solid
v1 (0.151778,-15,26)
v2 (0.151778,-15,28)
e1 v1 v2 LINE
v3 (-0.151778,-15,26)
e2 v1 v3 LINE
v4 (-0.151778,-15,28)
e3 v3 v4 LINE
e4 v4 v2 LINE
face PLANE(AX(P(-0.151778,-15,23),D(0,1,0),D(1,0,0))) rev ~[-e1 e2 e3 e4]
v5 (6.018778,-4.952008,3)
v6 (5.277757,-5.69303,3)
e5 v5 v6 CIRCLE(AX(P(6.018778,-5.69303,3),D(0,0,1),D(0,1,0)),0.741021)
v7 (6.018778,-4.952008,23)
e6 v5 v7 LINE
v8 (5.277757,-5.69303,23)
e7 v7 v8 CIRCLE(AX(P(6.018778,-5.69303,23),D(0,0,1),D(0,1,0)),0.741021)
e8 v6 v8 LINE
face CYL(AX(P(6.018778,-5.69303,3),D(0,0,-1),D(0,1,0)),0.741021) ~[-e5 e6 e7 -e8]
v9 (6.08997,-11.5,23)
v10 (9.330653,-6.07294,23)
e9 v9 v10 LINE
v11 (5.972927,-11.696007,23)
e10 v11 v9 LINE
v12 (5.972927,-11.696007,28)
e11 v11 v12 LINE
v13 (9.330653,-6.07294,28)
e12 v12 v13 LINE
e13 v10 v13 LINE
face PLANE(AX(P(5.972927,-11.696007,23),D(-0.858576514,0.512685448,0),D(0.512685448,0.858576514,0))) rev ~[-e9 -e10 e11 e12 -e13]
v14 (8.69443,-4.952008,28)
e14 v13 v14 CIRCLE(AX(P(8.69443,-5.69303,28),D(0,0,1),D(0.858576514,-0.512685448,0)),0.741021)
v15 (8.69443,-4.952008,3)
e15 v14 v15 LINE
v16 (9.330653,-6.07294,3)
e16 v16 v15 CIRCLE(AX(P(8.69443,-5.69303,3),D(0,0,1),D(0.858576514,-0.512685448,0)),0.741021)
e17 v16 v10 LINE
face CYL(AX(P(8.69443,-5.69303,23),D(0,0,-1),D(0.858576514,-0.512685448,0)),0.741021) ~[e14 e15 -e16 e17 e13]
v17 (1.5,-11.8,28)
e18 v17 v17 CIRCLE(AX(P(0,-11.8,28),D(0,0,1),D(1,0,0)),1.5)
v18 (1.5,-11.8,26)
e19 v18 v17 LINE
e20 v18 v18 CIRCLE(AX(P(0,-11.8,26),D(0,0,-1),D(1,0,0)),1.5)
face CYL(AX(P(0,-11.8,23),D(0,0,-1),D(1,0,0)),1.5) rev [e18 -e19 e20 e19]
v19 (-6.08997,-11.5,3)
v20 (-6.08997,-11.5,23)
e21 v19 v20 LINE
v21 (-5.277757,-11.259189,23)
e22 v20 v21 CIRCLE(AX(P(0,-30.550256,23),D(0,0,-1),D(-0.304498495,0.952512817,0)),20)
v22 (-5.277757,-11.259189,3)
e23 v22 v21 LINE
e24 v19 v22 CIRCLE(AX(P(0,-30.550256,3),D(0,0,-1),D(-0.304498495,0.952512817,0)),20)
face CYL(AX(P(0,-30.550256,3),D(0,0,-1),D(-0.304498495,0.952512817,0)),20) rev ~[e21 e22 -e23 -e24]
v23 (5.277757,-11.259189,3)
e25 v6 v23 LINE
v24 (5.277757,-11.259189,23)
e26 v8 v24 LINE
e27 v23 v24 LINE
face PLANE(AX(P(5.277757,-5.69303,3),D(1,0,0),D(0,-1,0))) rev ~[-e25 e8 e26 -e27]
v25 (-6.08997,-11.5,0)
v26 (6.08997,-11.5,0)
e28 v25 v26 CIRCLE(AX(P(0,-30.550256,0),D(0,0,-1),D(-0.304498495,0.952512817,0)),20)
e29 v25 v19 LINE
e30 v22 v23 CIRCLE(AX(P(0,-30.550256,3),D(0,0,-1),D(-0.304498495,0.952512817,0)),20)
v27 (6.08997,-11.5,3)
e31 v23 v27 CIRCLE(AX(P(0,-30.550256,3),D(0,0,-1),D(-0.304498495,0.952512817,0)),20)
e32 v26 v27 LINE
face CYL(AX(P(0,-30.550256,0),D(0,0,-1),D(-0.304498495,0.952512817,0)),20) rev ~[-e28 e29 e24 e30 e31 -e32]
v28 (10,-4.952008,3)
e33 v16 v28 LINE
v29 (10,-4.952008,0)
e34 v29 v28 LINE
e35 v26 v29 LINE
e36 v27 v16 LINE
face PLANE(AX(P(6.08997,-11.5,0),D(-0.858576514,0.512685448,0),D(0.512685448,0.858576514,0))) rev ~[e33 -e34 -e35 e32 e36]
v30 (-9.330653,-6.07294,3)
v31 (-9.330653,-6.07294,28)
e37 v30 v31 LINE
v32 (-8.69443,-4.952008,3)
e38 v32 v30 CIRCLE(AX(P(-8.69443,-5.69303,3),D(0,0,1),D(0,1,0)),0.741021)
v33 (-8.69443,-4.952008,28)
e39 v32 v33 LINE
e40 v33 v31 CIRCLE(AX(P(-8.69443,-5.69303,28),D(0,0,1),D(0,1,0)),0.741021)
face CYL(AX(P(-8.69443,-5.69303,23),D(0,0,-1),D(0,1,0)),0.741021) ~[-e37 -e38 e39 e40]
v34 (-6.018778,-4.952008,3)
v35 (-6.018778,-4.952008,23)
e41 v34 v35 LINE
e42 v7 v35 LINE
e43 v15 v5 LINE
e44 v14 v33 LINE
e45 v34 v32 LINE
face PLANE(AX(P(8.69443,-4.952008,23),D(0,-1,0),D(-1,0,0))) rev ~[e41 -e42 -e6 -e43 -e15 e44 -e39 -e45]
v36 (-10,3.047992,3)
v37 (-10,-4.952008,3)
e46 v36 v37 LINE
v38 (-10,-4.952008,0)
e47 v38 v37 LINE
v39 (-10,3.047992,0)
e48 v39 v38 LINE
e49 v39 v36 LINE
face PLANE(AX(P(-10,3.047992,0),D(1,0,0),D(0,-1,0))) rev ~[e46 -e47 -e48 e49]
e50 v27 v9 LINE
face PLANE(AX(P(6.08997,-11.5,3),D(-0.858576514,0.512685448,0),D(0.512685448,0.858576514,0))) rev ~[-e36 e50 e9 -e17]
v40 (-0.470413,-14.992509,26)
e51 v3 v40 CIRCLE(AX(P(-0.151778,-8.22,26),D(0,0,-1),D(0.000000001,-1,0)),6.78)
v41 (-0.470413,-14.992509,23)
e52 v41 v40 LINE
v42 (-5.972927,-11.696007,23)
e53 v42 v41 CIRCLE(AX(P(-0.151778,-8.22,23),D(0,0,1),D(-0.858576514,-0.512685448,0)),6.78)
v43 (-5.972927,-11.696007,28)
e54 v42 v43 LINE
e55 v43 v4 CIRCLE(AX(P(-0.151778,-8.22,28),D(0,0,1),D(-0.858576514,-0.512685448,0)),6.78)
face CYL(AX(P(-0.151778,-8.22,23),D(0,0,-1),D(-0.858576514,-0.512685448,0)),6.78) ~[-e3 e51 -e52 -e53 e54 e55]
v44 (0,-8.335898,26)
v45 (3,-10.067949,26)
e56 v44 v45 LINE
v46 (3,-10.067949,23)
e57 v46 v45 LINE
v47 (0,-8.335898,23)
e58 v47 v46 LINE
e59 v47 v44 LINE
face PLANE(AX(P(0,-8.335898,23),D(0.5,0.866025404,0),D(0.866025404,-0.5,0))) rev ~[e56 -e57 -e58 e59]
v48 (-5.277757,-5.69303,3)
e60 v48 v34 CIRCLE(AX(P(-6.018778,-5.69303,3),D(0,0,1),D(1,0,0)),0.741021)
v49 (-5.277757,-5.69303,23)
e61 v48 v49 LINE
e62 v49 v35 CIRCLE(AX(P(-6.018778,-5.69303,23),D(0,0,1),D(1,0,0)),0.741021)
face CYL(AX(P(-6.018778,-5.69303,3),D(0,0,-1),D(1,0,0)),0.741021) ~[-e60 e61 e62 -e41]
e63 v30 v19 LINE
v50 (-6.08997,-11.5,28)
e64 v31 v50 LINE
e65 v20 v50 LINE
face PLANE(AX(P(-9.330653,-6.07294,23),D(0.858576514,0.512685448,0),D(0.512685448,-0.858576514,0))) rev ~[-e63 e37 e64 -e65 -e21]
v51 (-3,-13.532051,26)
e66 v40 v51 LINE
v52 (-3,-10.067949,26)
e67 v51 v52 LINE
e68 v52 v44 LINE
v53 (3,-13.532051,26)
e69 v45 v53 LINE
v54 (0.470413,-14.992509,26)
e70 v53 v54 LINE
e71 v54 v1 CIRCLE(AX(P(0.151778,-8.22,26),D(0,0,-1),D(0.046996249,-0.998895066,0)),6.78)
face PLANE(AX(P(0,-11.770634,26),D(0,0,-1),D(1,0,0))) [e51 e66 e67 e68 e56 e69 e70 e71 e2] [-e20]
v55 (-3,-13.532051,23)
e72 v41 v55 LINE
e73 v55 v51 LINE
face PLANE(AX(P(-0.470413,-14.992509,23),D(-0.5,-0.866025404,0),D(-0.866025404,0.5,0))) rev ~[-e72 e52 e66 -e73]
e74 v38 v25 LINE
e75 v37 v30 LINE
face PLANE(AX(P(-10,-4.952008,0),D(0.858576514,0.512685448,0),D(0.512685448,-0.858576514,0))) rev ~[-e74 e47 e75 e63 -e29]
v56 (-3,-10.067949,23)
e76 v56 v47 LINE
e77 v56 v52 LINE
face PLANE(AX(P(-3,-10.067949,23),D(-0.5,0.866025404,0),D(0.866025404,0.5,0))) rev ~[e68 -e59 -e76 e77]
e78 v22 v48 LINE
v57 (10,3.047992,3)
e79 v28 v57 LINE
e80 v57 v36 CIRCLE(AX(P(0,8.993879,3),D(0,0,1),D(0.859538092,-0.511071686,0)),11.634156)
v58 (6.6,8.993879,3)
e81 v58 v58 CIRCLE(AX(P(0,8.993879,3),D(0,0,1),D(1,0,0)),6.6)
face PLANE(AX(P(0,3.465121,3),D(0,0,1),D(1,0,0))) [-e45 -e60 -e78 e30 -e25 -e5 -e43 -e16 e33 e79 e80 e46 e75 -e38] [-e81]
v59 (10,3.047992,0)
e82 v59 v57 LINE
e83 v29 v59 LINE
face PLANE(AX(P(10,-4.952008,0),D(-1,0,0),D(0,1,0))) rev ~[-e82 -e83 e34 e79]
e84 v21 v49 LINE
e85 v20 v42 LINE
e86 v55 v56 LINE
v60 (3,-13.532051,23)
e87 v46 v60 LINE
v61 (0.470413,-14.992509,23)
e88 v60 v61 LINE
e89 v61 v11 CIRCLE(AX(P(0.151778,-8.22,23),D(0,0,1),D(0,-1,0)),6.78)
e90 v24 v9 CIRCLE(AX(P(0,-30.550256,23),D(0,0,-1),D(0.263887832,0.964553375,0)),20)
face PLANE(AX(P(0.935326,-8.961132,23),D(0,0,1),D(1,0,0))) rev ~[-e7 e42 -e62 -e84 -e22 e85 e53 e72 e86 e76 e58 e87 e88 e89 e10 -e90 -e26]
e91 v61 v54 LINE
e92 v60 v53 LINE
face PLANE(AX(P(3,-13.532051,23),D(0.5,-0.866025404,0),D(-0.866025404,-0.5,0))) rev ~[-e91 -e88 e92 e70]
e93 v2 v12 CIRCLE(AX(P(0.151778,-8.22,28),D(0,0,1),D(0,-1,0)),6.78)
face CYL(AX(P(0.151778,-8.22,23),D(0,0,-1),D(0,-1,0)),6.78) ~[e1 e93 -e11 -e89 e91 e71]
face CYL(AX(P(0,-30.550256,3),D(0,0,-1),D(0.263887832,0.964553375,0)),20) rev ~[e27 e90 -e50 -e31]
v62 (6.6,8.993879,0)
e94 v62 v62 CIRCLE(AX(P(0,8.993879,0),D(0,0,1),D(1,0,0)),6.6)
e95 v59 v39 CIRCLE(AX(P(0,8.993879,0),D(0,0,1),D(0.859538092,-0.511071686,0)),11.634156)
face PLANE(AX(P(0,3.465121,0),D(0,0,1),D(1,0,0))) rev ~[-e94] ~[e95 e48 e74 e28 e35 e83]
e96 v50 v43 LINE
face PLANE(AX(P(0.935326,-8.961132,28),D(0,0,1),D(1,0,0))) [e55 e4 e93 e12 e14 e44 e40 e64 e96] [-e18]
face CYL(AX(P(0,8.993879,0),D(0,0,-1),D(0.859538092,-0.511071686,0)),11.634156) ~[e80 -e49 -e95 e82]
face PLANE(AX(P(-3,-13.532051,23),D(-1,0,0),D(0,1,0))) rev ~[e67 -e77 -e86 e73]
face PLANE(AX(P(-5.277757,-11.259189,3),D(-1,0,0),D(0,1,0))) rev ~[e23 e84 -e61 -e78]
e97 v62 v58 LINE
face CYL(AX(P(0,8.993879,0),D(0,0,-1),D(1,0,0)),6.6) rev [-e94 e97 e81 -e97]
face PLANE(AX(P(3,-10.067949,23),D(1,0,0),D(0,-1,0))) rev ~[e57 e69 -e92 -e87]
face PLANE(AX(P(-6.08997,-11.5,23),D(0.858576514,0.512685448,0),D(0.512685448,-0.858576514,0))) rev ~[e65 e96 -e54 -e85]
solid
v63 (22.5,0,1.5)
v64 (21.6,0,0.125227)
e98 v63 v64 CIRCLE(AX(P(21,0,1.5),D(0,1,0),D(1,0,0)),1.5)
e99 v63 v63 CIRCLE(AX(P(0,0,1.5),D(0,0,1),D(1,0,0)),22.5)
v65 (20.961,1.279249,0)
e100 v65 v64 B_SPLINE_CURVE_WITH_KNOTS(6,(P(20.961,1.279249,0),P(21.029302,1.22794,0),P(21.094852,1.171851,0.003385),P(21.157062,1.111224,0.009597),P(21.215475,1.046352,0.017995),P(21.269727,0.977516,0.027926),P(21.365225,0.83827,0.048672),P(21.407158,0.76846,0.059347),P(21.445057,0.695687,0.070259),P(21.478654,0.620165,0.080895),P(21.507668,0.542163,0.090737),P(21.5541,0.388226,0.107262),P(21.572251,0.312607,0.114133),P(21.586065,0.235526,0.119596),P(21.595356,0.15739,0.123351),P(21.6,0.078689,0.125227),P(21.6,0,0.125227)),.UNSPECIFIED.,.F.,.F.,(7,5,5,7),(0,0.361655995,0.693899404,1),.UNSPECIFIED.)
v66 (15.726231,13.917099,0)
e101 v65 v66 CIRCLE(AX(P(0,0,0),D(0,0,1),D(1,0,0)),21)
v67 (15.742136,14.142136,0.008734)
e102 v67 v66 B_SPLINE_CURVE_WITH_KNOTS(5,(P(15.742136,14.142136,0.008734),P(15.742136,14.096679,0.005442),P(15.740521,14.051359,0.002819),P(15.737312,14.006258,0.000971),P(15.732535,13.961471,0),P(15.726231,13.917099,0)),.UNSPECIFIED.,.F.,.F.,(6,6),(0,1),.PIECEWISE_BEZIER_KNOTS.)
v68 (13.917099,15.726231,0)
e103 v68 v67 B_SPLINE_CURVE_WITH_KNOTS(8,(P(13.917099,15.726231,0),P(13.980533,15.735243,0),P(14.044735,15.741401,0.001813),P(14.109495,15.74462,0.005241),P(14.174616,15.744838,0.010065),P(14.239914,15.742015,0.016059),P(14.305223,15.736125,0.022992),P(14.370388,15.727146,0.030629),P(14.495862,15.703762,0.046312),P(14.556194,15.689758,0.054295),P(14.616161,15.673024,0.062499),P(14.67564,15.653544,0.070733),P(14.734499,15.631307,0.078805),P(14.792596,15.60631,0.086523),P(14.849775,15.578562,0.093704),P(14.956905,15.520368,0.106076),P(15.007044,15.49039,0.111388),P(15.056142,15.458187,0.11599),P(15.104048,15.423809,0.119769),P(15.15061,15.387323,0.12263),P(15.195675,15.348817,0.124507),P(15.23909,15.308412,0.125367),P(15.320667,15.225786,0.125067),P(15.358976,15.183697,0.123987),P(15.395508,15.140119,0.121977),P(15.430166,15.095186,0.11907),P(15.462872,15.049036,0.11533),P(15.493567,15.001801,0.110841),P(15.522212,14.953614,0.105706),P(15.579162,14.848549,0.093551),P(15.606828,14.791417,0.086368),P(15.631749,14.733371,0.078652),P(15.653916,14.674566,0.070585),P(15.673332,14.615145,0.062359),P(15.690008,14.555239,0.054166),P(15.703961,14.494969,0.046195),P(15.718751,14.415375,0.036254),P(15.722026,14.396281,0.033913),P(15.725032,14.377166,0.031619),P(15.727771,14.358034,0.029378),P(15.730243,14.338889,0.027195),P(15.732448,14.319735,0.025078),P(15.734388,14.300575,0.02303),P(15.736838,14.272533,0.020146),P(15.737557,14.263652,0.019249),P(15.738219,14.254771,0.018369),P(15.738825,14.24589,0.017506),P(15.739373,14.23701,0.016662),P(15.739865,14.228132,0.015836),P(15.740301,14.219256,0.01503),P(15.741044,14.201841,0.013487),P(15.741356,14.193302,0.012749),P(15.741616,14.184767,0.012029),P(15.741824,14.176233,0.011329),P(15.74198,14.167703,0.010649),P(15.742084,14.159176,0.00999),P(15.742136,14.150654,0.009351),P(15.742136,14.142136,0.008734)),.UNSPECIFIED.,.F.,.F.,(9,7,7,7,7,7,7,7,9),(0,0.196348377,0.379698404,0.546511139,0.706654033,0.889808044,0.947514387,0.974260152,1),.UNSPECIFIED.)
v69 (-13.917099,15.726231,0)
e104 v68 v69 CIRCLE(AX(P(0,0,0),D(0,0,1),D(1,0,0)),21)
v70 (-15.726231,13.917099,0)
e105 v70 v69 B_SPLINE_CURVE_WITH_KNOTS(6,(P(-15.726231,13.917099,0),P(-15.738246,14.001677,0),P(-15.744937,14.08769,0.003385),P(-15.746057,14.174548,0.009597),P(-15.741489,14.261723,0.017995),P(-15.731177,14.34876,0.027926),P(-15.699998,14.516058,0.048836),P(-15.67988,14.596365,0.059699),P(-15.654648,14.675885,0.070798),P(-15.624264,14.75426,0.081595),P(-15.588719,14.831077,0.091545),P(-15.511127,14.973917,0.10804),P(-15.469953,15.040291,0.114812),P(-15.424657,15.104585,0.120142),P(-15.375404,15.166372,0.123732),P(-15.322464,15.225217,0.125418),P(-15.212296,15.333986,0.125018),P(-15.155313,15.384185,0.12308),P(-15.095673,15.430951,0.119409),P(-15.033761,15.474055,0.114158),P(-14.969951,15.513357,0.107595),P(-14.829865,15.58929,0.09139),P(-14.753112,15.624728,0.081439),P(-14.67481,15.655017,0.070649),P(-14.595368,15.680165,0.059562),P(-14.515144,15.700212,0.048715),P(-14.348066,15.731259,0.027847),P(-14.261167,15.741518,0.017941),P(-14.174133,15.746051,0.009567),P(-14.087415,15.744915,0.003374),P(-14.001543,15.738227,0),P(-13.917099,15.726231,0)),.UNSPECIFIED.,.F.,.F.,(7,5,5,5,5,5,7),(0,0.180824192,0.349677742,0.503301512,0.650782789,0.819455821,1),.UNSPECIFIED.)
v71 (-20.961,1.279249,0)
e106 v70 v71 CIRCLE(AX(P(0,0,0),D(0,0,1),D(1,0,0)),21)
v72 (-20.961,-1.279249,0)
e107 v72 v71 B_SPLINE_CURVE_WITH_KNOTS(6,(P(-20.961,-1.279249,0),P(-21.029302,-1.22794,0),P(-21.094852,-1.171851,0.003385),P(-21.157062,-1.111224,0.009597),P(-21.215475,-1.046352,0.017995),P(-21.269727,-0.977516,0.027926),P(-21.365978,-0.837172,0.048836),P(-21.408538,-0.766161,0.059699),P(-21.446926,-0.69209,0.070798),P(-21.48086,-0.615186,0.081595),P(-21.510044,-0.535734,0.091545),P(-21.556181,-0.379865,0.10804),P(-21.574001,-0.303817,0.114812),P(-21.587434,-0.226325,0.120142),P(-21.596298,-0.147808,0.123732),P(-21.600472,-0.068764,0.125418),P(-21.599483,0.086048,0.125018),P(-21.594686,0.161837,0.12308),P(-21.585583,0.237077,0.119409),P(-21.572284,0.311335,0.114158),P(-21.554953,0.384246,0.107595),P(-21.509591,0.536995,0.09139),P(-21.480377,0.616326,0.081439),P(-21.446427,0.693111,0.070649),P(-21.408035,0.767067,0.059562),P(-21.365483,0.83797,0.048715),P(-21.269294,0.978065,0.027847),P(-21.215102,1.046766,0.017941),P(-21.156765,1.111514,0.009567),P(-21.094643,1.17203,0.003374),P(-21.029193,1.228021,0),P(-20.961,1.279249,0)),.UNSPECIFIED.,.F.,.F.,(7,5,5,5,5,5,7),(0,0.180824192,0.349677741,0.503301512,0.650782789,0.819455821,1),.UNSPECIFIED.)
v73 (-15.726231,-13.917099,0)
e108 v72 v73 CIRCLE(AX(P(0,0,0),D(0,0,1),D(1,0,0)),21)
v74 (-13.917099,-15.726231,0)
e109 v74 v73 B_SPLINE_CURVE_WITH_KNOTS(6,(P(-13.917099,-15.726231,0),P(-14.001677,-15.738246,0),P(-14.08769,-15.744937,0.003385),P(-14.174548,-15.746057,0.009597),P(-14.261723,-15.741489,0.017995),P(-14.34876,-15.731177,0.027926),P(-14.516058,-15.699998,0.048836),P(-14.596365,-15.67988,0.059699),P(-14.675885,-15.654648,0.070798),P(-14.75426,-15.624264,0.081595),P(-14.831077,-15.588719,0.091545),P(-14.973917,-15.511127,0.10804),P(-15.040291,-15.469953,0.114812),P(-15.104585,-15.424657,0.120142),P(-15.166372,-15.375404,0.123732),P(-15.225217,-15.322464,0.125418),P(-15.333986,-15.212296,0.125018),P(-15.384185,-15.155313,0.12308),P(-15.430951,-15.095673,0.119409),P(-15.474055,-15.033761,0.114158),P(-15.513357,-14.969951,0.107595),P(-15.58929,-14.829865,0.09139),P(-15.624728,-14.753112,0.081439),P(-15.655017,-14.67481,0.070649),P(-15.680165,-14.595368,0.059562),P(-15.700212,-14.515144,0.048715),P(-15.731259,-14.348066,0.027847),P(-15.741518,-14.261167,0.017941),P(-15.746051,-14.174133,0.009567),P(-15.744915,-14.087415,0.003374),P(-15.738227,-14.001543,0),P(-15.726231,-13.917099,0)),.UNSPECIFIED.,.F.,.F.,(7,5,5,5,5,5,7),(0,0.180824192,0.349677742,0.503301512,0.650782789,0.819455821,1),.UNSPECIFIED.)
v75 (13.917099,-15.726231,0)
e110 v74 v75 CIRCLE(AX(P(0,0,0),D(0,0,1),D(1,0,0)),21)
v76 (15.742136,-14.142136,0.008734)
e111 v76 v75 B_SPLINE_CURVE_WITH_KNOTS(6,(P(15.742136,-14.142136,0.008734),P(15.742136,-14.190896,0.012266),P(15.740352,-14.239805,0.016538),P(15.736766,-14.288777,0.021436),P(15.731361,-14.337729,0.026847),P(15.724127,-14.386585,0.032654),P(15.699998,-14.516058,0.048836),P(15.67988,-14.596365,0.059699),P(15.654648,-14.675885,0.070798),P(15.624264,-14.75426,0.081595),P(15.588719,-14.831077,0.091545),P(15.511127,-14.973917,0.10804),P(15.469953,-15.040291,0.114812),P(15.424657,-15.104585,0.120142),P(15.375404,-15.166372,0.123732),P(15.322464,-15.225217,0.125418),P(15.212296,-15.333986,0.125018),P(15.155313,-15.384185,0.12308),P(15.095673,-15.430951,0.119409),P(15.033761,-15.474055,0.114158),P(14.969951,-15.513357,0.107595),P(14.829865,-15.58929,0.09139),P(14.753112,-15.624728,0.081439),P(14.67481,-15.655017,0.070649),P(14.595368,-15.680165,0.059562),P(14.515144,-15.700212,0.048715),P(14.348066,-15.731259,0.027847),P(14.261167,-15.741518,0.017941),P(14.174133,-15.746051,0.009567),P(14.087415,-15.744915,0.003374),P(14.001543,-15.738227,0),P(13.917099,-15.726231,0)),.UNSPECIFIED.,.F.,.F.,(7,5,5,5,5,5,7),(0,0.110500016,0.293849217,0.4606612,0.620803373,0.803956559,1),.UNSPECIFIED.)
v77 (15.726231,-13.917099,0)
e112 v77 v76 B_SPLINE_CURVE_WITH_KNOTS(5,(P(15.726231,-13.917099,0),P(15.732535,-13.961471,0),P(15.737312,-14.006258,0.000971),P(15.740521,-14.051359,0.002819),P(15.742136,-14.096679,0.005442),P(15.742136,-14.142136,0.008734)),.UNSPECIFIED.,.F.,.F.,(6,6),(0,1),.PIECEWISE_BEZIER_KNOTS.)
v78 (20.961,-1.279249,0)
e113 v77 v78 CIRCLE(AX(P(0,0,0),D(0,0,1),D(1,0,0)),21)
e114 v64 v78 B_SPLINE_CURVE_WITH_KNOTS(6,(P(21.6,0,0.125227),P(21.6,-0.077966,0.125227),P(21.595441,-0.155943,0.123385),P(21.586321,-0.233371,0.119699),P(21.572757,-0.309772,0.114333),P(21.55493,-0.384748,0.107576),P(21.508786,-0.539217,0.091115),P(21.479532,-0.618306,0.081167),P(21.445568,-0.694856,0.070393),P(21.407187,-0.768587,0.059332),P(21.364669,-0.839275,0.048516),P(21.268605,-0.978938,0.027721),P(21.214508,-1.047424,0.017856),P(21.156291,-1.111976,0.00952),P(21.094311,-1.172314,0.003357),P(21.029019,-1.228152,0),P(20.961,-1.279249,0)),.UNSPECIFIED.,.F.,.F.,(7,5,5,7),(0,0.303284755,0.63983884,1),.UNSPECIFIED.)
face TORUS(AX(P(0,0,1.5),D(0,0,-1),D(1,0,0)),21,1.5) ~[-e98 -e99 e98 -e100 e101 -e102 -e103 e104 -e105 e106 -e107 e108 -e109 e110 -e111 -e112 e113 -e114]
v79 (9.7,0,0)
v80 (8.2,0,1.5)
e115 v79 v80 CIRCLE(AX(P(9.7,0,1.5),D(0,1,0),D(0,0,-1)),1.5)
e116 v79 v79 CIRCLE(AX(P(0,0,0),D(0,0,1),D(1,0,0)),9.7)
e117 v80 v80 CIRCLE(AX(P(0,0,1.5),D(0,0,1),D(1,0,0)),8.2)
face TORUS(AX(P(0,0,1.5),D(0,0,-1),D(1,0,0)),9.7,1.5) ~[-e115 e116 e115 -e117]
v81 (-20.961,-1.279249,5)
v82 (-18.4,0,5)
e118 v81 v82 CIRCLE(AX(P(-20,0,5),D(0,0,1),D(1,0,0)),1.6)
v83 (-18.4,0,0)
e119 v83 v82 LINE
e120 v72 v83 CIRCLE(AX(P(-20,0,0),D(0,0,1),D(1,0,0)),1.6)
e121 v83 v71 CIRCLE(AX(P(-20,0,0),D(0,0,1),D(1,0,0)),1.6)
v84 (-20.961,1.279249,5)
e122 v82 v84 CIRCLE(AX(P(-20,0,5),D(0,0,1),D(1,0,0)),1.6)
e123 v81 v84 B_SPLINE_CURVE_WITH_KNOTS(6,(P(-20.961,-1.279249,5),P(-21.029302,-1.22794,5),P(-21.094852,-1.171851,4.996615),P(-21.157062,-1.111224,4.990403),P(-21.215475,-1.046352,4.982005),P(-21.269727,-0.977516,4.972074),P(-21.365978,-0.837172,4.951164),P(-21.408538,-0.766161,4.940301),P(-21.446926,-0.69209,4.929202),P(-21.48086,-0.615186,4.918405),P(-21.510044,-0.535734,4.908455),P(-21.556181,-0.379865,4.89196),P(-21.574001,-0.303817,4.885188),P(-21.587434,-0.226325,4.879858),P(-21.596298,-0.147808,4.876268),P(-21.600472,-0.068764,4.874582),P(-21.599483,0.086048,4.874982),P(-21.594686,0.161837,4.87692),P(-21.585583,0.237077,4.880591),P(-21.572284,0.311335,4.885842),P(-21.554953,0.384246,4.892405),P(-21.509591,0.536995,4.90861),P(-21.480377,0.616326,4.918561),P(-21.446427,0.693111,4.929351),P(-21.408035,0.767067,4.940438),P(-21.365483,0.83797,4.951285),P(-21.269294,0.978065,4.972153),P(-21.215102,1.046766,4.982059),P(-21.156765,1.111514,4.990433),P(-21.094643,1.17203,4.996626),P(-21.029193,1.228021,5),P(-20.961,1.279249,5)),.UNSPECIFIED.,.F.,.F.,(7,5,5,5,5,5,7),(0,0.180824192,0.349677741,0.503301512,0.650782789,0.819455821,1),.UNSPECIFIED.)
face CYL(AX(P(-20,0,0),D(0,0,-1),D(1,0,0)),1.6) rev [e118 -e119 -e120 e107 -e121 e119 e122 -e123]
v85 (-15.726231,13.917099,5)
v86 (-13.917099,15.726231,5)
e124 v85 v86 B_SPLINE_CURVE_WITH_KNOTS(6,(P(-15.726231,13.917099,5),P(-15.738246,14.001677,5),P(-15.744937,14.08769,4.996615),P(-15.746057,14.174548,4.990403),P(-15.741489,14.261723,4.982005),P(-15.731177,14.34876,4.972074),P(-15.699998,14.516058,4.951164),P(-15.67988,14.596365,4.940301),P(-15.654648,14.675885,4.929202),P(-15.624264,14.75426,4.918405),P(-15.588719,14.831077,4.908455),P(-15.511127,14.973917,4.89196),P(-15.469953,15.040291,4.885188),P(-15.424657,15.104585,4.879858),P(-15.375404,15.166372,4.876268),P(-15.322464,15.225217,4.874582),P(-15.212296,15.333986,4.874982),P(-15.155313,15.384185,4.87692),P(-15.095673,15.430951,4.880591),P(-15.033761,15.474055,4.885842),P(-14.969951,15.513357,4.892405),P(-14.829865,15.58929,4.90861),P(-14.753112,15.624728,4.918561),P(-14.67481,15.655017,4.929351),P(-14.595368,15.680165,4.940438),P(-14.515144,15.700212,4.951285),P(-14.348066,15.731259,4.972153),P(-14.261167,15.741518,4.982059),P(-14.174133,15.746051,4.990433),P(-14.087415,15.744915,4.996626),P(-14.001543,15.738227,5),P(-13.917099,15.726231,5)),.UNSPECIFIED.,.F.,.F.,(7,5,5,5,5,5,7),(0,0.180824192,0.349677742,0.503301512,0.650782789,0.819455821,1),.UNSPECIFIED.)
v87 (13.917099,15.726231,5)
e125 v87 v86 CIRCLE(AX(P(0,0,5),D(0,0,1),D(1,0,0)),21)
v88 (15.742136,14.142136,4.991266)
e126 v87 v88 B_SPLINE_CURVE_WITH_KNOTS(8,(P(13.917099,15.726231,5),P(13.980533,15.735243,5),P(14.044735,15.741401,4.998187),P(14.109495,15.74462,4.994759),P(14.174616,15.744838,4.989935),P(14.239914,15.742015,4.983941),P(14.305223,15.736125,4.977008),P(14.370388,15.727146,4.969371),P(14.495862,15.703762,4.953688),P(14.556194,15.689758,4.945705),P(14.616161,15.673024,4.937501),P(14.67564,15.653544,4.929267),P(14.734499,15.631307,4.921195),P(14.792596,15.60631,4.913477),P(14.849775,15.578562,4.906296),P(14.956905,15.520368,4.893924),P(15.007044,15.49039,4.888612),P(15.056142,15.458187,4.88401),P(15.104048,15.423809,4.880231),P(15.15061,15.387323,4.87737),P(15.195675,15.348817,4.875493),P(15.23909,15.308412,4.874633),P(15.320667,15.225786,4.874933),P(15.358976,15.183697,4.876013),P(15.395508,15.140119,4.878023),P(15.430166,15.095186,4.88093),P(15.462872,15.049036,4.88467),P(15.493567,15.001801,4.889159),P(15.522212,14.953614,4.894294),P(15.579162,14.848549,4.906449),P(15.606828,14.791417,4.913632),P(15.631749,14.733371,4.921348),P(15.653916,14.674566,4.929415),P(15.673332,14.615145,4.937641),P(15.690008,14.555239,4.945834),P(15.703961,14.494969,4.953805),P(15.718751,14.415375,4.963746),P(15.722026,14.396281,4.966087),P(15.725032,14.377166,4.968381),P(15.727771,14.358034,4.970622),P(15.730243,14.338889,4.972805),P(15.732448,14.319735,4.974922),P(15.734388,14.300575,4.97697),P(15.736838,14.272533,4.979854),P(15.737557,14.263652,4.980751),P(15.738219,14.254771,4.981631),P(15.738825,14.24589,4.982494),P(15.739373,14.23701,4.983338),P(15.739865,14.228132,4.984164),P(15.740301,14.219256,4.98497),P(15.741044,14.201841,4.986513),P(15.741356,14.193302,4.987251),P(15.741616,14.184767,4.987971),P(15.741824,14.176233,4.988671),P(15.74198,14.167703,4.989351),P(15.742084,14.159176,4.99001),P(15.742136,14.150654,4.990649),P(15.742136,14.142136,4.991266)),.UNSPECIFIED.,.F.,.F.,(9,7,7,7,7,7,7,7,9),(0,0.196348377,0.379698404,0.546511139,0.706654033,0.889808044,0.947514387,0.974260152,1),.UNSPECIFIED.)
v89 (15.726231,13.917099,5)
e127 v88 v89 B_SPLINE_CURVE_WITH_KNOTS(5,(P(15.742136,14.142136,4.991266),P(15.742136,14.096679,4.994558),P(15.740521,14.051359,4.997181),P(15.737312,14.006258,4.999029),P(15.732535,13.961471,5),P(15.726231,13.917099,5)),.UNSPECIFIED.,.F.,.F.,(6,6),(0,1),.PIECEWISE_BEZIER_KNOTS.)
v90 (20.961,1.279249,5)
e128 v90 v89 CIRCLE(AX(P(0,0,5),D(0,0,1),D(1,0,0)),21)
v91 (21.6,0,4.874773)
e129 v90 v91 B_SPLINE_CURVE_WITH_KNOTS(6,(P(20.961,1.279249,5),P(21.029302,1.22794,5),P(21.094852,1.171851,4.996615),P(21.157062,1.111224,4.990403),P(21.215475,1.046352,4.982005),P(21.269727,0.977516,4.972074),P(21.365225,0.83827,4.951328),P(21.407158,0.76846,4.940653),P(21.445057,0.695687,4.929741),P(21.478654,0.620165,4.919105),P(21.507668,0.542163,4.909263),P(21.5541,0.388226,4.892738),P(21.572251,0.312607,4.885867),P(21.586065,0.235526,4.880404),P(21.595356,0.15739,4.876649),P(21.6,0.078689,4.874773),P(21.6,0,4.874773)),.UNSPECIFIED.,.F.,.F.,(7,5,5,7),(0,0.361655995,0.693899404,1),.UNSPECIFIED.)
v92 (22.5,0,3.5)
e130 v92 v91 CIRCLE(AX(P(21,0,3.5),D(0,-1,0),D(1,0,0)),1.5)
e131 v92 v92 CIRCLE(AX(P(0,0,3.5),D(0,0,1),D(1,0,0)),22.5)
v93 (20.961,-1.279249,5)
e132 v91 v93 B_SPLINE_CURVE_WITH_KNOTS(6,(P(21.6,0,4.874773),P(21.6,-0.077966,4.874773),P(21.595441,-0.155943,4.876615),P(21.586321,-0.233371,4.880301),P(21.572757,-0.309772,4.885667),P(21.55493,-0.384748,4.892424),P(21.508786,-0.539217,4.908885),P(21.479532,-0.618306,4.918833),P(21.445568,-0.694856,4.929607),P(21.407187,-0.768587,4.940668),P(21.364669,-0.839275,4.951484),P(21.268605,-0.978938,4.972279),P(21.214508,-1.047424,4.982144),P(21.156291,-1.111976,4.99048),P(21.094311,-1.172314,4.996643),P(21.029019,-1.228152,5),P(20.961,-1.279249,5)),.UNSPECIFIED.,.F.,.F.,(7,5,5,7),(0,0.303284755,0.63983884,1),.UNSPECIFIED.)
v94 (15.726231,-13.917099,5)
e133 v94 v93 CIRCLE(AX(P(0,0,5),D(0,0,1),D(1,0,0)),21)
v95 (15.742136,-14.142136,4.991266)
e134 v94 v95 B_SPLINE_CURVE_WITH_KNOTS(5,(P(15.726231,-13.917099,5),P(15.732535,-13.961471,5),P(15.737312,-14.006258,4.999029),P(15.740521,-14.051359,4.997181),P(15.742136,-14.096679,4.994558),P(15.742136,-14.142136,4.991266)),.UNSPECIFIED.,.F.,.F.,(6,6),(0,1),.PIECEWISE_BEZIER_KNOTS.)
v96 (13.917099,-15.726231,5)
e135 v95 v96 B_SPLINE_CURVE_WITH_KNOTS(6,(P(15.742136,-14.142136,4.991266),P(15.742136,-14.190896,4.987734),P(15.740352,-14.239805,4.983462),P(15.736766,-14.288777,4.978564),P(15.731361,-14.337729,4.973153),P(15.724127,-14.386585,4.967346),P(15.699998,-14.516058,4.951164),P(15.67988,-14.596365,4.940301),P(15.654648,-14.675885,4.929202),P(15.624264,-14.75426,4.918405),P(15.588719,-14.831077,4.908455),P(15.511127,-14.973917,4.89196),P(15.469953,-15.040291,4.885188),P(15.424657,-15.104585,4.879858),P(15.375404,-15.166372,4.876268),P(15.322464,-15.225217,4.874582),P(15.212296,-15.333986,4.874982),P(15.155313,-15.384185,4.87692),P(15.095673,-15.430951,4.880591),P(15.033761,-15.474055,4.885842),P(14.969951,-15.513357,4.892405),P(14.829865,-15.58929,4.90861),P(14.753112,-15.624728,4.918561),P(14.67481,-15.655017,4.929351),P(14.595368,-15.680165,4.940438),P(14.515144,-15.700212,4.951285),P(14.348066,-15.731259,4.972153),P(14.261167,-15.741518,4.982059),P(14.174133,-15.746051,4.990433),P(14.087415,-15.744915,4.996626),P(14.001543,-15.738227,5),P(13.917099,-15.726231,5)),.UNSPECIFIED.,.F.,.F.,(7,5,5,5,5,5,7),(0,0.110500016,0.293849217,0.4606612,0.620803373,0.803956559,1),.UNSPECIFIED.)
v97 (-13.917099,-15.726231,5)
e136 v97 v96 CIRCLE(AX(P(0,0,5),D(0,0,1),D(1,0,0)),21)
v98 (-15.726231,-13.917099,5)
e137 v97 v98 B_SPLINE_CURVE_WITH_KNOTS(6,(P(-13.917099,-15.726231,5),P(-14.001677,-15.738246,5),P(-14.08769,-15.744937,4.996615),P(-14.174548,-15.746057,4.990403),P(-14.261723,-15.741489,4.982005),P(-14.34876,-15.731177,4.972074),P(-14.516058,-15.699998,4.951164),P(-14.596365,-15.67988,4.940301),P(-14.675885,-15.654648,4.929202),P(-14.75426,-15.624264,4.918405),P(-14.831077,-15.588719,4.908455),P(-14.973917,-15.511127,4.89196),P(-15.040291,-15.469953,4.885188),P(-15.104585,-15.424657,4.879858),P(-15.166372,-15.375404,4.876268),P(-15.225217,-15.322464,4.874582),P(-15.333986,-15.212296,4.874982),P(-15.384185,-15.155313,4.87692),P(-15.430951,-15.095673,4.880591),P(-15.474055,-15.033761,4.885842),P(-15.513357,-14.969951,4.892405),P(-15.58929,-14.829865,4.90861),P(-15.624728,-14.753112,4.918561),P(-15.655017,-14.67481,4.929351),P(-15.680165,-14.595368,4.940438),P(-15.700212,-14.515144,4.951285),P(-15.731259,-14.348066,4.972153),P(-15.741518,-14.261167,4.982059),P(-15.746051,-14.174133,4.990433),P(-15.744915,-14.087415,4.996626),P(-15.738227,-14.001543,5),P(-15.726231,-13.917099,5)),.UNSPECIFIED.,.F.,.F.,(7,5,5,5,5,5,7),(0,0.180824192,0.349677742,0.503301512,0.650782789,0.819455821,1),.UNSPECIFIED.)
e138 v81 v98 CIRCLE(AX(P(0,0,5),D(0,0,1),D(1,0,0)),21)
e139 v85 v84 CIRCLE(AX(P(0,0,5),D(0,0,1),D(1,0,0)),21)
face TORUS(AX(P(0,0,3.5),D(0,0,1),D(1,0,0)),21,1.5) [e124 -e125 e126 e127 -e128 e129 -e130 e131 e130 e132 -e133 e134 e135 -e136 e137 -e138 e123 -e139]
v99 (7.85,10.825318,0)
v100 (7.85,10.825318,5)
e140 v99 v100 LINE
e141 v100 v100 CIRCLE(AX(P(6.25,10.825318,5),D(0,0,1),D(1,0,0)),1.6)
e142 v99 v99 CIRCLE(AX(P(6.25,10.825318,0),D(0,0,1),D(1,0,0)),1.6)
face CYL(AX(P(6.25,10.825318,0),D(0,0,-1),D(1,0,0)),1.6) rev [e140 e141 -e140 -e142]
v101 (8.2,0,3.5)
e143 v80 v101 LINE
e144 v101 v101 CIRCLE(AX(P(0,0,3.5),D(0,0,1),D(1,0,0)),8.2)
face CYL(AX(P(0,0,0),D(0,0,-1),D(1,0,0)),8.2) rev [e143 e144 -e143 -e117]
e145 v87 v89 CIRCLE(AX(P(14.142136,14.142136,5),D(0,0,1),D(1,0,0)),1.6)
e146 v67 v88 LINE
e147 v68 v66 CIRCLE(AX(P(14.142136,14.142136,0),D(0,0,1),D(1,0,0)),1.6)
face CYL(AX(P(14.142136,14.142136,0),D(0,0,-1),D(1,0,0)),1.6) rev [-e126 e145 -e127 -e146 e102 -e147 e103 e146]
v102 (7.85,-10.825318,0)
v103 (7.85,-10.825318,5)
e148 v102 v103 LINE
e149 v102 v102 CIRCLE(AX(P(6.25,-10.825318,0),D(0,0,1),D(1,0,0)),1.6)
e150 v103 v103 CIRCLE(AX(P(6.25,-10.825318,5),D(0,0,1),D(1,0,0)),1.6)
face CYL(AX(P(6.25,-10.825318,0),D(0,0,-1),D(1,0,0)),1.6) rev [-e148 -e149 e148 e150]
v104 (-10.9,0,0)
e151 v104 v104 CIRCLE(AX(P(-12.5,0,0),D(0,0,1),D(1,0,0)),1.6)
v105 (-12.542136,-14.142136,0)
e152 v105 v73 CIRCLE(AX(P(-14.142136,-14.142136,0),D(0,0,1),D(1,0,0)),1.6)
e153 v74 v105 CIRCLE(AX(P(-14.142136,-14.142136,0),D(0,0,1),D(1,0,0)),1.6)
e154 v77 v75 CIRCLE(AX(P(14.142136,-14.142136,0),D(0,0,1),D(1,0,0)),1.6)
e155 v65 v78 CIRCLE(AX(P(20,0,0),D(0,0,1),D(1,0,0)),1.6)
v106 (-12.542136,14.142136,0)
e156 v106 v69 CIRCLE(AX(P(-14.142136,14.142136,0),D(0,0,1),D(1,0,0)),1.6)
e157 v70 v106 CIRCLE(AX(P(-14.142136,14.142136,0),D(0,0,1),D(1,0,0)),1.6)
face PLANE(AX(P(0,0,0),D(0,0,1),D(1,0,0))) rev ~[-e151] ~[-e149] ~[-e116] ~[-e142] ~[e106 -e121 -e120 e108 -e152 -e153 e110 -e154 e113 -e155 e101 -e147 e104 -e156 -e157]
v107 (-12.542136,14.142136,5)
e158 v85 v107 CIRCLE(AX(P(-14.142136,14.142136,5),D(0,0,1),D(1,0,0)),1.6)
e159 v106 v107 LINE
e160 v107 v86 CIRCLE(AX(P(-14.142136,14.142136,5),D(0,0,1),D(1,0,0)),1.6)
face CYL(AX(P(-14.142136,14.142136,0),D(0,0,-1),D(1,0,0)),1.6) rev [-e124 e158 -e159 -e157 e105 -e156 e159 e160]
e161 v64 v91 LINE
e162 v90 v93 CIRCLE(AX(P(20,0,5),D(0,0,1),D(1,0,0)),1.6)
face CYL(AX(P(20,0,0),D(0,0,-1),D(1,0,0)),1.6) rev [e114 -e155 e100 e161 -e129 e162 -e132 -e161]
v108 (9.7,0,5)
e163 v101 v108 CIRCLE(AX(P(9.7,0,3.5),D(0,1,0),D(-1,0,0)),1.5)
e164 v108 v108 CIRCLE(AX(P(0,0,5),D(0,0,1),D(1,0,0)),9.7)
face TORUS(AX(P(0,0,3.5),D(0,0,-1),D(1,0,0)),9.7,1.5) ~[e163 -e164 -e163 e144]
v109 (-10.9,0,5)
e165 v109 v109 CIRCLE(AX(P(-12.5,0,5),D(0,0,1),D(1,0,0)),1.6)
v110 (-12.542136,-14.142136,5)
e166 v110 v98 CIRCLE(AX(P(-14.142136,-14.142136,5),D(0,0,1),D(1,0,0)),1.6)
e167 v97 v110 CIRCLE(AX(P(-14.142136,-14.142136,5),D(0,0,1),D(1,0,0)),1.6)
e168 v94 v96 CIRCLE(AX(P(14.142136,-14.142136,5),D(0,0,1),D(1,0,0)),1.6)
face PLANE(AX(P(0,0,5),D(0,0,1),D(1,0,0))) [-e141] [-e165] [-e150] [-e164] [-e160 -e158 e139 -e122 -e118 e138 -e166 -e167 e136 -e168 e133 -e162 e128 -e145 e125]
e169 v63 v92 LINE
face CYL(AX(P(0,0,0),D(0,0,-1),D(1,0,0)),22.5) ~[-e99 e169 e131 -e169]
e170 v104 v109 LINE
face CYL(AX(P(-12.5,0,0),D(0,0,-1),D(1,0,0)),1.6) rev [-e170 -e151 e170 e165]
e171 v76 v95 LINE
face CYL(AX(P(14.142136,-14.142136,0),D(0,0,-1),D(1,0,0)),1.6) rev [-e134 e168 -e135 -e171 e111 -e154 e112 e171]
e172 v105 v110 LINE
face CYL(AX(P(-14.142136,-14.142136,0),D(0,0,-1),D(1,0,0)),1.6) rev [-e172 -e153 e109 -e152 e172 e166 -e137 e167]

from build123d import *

# Parameters (mm, degrees)
F0_R     = 6.6
F1_DEPTH = 3
F3_DEPTH = 20
F4_R     = 1.5
F5_DEPTH = 5
F6_R     = 1.5
F7_DEPTH = 3
F8_R     = 22.5
F8_R_2   = 1.6
F8_R_3   = 8.2
F9_DEPTH = 5


# Not quite as in the source:
# - a fillet or chamfer that OpenCascade refuses, or shapes differently, is made with other operations: its cross-section is extruded or revolved along the edge and cut away or added


with BuildPart() as f1:
    # F0 (on Top) → F1 (new body)
    with BuildSketch(Plane.XY):
        with BuildLine():
            Line((10, -4.9520083861), (10, 3.0479916139))
            ThreePointArc((10, 3.0479916139), (0, 20.6280349051), (-10, 3.0479916139))
            Line((-10, 3.0479916139), (-10, -4.9520083861))
            Line((-10, -4.9520083861), (-6.0899698972, -11.5))
            ThreePointArc((-6.0899698972, -11.5), (0, -10.5502563408), (6.0899698972, -11.5))
            Line((6.0899698972, -11.5), (10, -4.9520083861))
        make_face()
        with Locations((0, 8.9938791938)):
            Circle(F0_R, mode=Mode.SUBTRACT)
    extrude(amount=F1_DEPTH)

    # F2 (on face) → F3 (join)
    with BuildSketch(Plane.XY.offset(3)):
        with BuildLine():
            Line((-6.0187778734, -4.9520083861), (-8.694429646, -4.9520083861))
            ThreePointArc((-8.694429646, -4.9520083861), (-9.33888075, -5.3272492941), (-9.3306530777, -6.0729404298))
            Line((-9.3306530777, -6.0729404298), (-6.0899698972, -11.5))
            ThreePointArc((-6.0899698972, -11.5), (-5.6851384444, -11.375293476), (-5.2777566353, -11.259188851))
            Line((-5.2777566353, -11.259188851), (-5.2777566353, -5.6930296241))
            ThreePointArc((-5.2777566353, -5.6930296241), (-5.494796731, -5.1690484817), (-6.0187778734, -4.9520083861))
        make_face()
        with BuildLine():
            Line((5.2777566353, -5.6930296241), (5.2777566353, -11.259188851))
            ThreePointArc((5.2777566353, -11.259188851), (5.6851384444, -11.375293476), (6.0899698972, -11.5))
            Line((6.0899698972, -11.5), (9.3306530777, -6.0729404298))
            ThreePointArc((9.3306530777, -6.0729404298), (9.33888075, -5.3272492941), (8.694429646, -4.9520083861))
            Line((8.694429646, -4.9520083861), (6.0187778734, -4.9520083861))
            ThreePointArc((6.0187778734, -4.9520083861), (5.494796731, -5.1690484817), (5.2777566353, -5.6930296241))
        make_face()
    extrude(amount=F3_DEPTH)

    # F4 (on face) → F5 (join)
    with BuildSketch(Plane.XY.offset(23)):
        with BuildLine():
            Line((8.694429646, -4.9520083861), (-6.0187778734, -4.9520083861))
            ThreePointArc((-6.0187778734, -4.9520083861), (-5.494796731, -5.1690484817), (-5.2777566353, -5.6930296241))
            Line((-5.2777566353, -5.6930296241), (-5.2777566353, -11.259188851))
            ThreePointArc((-5.2777566353, -11.259188851), (-5.6851384444, -11.375293476), (-6.0899698972, -11.5))
            Line((-6.0899698972, -11.5), (-5.9729271999, -11.6960073402))
            ThreePointArc((-5.9729271999, -11.6960073402), (-3.4984984861, -14.1164281462), (-0.1517784325, -15))
            Line((-0.1517784325, -15), (0.1517784325, -15))
            ThreePointArc((0.1517784325, -15), (3.4984984861, -14.1164281462), (5.9729271999, -11.6960073402))
            Line((5.9729271999, -11.6960073402), (9.3306530777, -6.0729404298))
            ThreePointArc((9.3306530777, -6.0729404298), (9.33888075, -5.3272492941), (8.694429646, -4.9520083861))
        make_face()
        with Locations((0, -11.8)):
            Circle(F4_R, mode=Mode.SUBTRACT)
        with BuildLine():
            Line((-6.0187778734, -4.9520083861), (-8.694429646, -4.9520083861))
            ThreePointArc((-8.694429646, -4.9520083861), (-9.33888075, -5.3272492941), (-9.3306530777, -6.0729404298))
            Line((-9.3306530777, -6.0729404298), (-6.0899698972, -11.5))
            ThreePointArc((-6.0899698972, -11.5), (-5.6851384444, -11.375293476), (-5.2777566353, -11.259188851))
            Line((-5.2777566353, -11.259188851), (-5.2777566353, -5.6930296241))
            ThreePointArc((-5.2777566353, -5.6930296241), (-5.494796731, -5.1690484817), (-6.0187778734, -4.9520083861))
        make_face()
    extrude(amount=F5_DEPTH)

    # F6 (on face) → F7 (cut)
    with BuildSketch(Plane(origin=(0, 0, 23), x_dir=(1, 0, 0), z_dir=(0, 0, -1))):
        with BuildLine():
            Line((-0.4704129933, 14.9925085468), (-3, 13.5320508076))
            Line((-3, 13.5320508076), (-3, 10.0679491924))
            Line((-3, 10.0679491924), (0, 8.3358983849))
            Line((0, 8.3358983849), (3, 10.0679491924))
            Line((3, 10.0679491924), (3, 13.5320508076))
            Line((3, 13.5320508076), (0.4704129933, 14.9925085468))
            ThreePointArc((0.4704129933, 14.9925085468), (0.31113974, 14.998126878), (0.1517784325, 15))
            Line((0.1517784325, 15), (-0.1517784325, 15))
            ThreePointArc((-0.1517784325, 15), (-0.3111397399, 14.998126878), (-0.4704129933, 14.9925085468))
        make_face()
        with Locations((0, 11.8)):
            Circle(F6_R, mode=Mode.SUBTRACT)
    extrude(amount=-F7_DEPTH, mode=Mode.SUBTRACT)


with BuildPart() as f9:
    # F8 (on Top) → F9 (new body)
    with BuildSketch(Plane.XY):
        Circle(F8_R)
        with Locations((-14.1421356237, -14.1421356237)):
            Circle(F8_R_2, mode=Mode.SUBTRACT)
        with Locations((14.1421356237, -14.1421356237)):
            Circle(F8_R_2, mode=Mode.SUBTRACT)
        with Locations((6.25, -10.8253175473)):
            Circle(F8_R_2, mode=Mode.SUBTRACT)
        with Locations((-20, 0)):
            Circle(F8_R_2, mode=Mode.SUBTRACT)
        with Locations((-12.5, 0)):
            Circle(F8_R_2, mode=Mode.SUBTRACT)
        with Locations((-14.1421356237, 14.1421356237)):
            Circle(F8_R_2, mode=Mode.SUBTRACT)
        Circle(F8_R_3, mode=Mode.SUBTRACT)
        with Locations((6.25, 10.8253175473)):
            Circle(F8_R_2, mode=Mode.SUBTRACT)
        with Locations((20, 0)):
            Circle(F8_R_2, mode=Mode.SUBTRACT)
        with Locations((14.1421356237, 14.1421356237)):
            Circle(F8_R_2, mode=Mode.SUBTRACT)
    extrude(amount=F9_DEPTH)

    # F10: fillet of radius 1.5 on 1 edges, made by hand

    # F10_s1 → F10_t2 (revolve, cut)
    with BuildSketch(Plane.XZ):
        with BuildLine():
            ThreePointArc((22.5, 3.5), (22.0606601718, 4.5606601718), (21, 5))
            Line((21, 5), (22.5, 5))
            Line((22.5, 5), (22.5, 3.5))
        make_face()
    revolve(axis=Axis((0, 0, 5), (0, 0, 1)), mode=Mode.SUBTRACT)

    # F11: fillet of radius 1.5 on 3 edges, made by hand

    # F11_s1 → F11_t2 (revolve, cut)
    with BuildSketch(Plane.XZ):
        with BuildLine():
            ThreePointArc((22.5, 1.5), (22.0606601718, 0.4393398282), (21, 0))
            Line((21, 0), (22.5, 0))
            Line((22.5, 0), (22.5, 1.5))
        make_face()
    revolve(axis=Axis((0, 0, 0), (0, 0, 1)), mode=Mode.SUBTRACT)

    # F11_s3 → F11_t4 (revolve, cut)
    with BuildSketch(Plane.XZ):
        with BuildLine():
            ThreePointArc((9.7, 0), (8.6393398282, 0.4393398282), (8.2, 1.5))
            Line((8.2, 1.5), (8.2, 0))
            Line((8.2, 0), (9.7, 0))
        make_face()
    revolve(axis=Axis((0, 0, 0), (0, 0, 1)), mode=Mode.SUBTRACT)

    # F11_s5 → F11_t6 (revolve, cut)
    with BuildSketch(Plane.XZ):
        with BuildLine():
            ThreePointArc((8.2, 3.5), (8.6393398282, 4.5606601718), (9.7, 5))
            Line((9.7, 5), (8.2, 5))
            Line((8.2, 5), (8.2, 3.5))
        make_face()
    revolve(axis=Axis((0, 0, 5), (0, 0, 1)), mode=Mode.SUBTRACT)


solid = Compound([f1.part, f9.part])
